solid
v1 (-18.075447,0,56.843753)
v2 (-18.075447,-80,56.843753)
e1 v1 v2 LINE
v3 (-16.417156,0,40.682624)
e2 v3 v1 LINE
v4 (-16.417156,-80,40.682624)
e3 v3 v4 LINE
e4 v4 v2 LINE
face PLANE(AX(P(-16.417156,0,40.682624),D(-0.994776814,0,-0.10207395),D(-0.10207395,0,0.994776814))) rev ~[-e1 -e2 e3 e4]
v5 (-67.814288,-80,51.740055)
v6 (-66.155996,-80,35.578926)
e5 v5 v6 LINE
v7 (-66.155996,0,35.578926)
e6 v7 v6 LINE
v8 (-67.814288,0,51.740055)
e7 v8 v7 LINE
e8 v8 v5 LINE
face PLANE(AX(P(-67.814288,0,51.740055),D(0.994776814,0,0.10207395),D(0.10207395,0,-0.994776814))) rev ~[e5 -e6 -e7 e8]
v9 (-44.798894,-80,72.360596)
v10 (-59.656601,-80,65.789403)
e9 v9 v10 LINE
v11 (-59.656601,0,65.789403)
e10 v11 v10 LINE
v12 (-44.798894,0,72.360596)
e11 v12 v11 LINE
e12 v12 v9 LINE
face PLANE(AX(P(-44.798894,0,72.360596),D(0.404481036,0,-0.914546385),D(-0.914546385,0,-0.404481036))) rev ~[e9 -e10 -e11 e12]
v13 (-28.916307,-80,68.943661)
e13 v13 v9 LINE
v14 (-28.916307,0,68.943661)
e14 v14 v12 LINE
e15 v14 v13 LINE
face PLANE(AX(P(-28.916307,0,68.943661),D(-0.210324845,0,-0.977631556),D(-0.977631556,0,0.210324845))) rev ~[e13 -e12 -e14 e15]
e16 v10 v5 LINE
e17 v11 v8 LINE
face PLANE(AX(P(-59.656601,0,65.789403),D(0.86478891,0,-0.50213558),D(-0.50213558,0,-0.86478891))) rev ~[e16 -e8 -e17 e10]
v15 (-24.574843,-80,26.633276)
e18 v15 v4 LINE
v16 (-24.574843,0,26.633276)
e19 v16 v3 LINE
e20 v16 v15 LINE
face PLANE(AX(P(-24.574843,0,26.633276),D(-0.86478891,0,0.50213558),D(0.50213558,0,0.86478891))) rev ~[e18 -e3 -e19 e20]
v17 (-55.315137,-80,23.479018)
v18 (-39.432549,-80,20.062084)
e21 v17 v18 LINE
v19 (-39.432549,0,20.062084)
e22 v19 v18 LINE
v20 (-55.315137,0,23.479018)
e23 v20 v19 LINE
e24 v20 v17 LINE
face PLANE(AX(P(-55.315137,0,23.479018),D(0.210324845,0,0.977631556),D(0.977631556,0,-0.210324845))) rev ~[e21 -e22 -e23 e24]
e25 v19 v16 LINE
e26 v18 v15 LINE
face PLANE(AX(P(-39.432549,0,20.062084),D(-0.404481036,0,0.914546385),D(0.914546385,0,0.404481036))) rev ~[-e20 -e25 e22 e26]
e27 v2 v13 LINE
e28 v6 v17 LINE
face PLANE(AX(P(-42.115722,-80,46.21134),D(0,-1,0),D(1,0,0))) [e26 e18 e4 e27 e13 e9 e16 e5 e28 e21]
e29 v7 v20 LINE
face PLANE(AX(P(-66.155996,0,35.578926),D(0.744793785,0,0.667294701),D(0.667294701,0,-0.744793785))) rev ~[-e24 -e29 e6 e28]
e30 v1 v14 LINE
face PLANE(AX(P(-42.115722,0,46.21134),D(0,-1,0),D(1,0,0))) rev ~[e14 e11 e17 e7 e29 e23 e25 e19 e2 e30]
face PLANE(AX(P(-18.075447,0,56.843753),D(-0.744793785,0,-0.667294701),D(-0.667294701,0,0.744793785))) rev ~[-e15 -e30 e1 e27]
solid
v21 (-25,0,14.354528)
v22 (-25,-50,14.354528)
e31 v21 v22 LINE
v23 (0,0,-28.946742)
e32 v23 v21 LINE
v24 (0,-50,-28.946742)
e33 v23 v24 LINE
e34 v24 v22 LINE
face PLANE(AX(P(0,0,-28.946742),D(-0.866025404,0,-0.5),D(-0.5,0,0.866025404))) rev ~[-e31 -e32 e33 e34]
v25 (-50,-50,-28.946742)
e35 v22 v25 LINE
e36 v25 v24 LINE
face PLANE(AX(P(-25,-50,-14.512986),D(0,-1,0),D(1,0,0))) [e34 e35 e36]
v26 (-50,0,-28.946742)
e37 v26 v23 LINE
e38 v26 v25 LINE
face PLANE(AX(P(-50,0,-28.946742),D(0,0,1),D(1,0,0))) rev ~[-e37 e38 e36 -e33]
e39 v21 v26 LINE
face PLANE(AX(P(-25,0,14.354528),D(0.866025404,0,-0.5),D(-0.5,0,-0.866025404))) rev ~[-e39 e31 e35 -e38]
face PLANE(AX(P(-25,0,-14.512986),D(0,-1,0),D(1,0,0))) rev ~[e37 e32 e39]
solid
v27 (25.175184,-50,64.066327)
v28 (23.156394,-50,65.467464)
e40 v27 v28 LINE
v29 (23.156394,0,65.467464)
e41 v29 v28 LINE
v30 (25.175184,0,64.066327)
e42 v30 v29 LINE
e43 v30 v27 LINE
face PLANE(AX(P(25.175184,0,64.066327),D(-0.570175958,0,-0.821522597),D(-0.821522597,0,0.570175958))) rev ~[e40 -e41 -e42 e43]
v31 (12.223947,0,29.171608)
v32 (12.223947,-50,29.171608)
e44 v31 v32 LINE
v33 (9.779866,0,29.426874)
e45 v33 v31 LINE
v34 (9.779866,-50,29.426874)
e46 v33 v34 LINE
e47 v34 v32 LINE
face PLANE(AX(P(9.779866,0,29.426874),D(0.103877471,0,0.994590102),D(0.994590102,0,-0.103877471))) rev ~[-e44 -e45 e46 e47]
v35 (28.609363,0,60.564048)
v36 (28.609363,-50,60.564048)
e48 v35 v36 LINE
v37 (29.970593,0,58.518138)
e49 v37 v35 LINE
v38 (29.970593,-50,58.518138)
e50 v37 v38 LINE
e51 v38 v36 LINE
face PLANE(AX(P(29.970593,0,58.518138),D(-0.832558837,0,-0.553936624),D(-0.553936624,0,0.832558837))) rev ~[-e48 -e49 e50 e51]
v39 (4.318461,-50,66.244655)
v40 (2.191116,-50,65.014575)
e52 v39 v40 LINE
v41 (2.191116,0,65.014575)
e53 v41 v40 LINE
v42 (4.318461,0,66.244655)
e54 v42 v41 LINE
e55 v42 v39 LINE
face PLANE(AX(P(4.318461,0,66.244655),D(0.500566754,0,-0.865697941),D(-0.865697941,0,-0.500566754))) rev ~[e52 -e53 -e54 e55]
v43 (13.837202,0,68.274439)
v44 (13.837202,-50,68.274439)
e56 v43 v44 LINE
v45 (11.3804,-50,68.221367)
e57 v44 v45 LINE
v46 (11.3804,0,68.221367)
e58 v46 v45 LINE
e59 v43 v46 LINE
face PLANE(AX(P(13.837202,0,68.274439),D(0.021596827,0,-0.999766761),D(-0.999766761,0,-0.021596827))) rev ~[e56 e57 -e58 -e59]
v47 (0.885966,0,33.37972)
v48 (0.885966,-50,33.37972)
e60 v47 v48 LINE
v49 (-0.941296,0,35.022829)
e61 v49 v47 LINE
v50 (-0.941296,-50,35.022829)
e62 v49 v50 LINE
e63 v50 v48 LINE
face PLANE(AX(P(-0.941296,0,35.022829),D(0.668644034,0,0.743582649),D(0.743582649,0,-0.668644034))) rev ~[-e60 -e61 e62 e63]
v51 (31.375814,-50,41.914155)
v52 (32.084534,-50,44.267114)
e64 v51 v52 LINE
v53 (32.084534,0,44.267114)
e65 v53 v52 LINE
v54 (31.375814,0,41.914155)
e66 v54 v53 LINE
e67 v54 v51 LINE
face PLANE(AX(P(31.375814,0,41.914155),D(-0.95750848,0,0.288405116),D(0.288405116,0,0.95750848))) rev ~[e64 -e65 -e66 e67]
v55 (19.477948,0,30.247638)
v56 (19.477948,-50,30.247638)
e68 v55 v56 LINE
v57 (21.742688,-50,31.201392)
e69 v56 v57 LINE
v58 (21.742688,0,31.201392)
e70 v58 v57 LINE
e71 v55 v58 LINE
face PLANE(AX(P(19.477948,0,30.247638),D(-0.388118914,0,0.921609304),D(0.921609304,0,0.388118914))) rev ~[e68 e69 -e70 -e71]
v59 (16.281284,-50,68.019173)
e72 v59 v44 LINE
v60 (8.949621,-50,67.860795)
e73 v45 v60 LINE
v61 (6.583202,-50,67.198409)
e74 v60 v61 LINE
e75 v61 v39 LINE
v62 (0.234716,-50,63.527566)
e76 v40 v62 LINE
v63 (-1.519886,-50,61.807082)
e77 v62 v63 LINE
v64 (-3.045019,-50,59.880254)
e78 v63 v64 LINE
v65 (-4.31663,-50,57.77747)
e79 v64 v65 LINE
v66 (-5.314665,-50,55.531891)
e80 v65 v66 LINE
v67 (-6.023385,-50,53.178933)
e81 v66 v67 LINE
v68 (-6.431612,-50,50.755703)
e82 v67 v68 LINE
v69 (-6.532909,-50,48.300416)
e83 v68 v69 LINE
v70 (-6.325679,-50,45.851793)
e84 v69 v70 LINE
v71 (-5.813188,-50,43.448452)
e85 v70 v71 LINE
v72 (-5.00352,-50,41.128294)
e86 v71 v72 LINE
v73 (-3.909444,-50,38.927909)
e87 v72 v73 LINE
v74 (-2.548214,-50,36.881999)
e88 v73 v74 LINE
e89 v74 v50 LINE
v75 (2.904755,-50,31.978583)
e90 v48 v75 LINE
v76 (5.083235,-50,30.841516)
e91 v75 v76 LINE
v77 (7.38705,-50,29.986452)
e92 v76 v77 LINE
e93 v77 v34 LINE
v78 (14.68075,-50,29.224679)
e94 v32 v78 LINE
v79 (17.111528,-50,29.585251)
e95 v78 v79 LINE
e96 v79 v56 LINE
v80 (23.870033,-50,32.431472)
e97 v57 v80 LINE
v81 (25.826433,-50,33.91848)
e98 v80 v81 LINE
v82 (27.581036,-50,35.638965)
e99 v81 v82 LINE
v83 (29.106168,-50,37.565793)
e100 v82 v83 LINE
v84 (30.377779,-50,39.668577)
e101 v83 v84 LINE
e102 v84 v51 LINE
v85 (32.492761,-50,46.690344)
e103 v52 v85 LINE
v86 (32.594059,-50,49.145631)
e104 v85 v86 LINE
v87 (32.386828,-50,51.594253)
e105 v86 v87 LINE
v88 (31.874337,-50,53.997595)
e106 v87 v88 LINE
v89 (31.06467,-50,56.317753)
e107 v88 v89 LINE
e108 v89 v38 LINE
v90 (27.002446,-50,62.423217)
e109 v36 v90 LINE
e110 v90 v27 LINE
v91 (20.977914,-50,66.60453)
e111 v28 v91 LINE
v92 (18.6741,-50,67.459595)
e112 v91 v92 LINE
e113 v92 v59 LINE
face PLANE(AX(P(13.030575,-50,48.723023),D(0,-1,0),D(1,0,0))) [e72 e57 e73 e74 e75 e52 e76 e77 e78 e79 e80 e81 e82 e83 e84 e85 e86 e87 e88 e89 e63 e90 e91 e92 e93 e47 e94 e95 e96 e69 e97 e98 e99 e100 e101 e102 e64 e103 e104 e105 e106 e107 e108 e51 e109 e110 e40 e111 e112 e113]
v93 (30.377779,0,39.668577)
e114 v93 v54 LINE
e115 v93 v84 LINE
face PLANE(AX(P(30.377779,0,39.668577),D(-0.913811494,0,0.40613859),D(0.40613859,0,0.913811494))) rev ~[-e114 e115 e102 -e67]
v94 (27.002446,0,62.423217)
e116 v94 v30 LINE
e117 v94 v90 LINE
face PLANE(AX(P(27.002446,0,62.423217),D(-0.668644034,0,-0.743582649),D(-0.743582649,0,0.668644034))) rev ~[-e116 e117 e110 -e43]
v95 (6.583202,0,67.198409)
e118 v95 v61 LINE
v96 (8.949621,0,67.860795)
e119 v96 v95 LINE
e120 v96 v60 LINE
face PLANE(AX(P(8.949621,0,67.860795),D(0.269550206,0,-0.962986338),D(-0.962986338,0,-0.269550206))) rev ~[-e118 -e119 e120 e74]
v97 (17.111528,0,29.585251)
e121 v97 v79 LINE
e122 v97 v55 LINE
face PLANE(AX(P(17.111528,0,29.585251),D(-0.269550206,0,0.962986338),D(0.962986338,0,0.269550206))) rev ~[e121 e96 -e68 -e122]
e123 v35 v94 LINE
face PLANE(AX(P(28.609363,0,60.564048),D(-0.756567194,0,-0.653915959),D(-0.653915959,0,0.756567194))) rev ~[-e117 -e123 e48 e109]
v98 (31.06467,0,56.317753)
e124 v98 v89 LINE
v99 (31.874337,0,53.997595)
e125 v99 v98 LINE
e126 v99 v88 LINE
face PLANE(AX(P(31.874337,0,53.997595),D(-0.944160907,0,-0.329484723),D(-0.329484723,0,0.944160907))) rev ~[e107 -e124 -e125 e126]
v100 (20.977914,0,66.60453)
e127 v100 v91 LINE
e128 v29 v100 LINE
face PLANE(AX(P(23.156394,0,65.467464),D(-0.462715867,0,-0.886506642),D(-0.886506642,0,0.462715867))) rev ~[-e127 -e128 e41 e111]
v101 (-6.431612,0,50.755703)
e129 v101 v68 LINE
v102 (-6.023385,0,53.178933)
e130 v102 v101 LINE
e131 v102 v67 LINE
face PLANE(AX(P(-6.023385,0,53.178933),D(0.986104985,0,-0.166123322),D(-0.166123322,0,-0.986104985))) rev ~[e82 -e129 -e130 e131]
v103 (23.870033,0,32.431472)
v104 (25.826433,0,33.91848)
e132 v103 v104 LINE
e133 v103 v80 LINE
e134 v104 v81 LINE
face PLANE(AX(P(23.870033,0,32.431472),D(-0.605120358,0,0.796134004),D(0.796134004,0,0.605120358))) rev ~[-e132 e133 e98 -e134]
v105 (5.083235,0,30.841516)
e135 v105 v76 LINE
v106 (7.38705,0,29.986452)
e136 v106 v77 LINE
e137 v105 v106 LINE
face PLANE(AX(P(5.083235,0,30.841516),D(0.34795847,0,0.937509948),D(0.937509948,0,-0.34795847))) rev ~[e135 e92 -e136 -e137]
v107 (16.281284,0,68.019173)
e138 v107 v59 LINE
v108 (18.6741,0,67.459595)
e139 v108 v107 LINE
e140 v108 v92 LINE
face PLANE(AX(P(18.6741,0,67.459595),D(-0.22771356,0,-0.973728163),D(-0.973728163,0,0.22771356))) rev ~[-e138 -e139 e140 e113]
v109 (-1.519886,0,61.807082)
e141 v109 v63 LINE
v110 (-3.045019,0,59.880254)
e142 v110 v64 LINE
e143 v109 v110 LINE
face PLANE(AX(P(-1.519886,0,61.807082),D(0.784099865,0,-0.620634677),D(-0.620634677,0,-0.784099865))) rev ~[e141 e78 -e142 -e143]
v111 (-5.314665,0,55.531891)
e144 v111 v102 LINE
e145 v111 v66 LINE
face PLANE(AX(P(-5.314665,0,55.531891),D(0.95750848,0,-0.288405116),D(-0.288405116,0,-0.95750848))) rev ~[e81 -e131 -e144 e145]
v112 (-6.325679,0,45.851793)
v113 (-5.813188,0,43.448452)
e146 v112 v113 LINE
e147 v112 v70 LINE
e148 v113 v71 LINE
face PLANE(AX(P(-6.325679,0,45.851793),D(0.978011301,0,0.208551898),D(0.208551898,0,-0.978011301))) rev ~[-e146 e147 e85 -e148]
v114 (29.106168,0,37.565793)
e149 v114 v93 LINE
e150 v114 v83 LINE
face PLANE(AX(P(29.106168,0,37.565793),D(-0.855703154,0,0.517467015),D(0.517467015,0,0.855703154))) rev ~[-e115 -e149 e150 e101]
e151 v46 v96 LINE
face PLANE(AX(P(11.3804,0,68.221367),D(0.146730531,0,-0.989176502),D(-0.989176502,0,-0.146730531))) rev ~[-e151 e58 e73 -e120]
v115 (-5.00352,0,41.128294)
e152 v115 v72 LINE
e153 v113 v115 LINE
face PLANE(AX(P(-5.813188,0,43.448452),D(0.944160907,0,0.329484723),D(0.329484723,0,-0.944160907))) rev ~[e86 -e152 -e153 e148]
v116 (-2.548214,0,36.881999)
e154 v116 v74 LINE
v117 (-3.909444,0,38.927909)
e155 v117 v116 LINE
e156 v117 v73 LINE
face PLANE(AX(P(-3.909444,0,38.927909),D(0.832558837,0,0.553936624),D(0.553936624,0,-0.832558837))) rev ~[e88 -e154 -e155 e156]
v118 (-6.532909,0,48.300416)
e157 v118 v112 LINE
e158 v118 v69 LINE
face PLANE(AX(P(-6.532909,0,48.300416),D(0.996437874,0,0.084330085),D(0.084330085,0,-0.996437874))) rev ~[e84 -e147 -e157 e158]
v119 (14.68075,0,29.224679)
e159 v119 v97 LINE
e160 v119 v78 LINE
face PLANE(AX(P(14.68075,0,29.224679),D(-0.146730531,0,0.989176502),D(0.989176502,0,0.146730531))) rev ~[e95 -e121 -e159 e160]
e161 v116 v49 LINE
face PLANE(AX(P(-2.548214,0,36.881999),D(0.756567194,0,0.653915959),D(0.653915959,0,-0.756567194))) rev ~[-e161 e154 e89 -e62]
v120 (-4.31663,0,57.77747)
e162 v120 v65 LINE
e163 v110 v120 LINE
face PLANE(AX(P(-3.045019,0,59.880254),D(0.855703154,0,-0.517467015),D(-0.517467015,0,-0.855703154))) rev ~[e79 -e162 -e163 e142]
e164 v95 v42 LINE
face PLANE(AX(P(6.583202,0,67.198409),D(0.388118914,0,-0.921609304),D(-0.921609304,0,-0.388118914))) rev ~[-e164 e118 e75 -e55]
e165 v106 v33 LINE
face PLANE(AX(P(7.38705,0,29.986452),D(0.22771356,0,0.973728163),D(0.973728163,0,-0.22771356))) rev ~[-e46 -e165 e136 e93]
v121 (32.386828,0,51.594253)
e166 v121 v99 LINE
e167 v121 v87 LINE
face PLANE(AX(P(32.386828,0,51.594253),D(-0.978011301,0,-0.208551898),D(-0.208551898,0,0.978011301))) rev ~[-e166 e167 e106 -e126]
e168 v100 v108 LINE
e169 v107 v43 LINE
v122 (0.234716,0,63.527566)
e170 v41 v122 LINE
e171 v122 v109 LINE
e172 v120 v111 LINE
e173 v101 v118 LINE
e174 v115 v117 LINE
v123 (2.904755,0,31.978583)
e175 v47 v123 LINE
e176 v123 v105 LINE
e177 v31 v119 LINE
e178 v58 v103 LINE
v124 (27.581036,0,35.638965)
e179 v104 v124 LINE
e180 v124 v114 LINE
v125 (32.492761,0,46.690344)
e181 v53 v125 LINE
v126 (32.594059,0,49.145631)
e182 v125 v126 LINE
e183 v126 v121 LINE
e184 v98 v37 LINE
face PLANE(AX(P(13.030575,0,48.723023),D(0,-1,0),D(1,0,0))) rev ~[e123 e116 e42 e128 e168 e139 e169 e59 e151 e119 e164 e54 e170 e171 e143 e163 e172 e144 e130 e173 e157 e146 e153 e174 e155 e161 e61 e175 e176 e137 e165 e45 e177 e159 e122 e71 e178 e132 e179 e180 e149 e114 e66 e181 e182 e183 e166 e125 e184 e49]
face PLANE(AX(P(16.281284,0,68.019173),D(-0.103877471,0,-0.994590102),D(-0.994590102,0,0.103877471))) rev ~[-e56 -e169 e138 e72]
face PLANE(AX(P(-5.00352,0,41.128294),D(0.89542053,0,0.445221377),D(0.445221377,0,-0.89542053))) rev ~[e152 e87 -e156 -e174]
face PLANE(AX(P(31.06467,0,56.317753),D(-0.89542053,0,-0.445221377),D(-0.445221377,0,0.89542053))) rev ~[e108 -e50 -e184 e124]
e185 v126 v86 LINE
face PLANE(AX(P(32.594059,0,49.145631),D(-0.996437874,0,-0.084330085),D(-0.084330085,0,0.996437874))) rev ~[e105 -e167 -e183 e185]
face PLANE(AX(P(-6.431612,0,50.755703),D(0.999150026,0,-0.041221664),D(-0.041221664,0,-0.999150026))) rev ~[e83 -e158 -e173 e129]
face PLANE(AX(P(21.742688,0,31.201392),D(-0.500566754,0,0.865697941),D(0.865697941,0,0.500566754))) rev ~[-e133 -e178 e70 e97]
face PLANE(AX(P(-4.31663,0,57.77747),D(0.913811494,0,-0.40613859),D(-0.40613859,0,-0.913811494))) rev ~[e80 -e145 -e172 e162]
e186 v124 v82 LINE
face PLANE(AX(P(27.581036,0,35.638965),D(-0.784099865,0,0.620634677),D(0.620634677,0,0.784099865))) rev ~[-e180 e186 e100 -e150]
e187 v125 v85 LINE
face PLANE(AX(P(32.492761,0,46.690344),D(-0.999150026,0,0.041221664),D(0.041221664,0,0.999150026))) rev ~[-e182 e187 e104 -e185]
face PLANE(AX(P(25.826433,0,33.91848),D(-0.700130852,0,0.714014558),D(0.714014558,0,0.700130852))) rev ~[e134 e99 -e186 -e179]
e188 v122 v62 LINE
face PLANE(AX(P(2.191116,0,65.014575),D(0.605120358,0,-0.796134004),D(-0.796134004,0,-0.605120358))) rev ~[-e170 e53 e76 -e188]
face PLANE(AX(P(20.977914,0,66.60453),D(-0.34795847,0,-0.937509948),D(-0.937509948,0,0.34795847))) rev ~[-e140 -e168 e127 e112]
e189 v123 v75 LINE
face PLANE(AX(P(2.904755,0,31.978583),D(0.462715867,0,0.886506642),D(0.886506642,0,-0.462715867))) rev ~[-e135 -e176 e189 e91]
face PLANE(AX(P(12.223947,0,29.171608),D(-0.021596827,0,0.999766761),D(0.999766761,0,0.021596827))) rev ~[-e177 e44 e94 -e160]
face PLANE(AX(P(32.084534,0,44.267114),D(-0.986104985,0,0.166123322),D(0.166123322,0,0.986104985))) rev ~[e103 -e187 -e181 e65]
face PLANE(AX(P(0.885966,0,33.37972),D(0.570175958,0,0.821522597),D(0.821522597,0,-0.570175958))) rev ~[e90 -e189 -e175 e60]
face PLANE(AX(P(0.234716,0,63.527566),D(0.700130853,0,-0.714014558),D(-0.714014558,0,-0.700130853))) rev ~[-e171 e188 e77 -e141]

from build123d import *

# Parameters (mm, degrees)
F1_DEPTH = 50
F3_DEPTH = 80
F5_DEPTH = 50


# Not quite as in the source:
# - the program builds the solid bodies; features that only make, move or delete a surface that nothing else refers to are left out


with BuildPart() as f1:
    # F0 (on Front) → F1 (new body)
    with BuildSketch(Plane.XZ):
        Polygon((-25, 14.3545279566), (-50, -28.9467422326), (0, -28.9467422326), align=None)
    extrude(amount=F1_DEPTH)


with BuildPart() as f3:
    # F2 (on Front) → F3 (new body)
    with BuildSketch(Plane.XZ):
        Polygon((-24.5748425958, 26.6332762849), (-16.4171555915, 40.6826237873), (-18.0754474364, 56.8437527904), (-28.9163070091, 68.9436613118), (-44.79889442, 72.360595557), (-59.6566011074, 65.7894027817), (-67.8142881117, 51.7400552794), (-66.1559962667, 35.5789262762), (-55.3151366941, 23.4790177548), (-39.4325492832, 20.0620835096), align=None)
    extrude(amount=F3_DEPTH)


with BuildPart() as f5:
    # F4 (on Front) → F5 (new body)
    with BuildSketch(Plane.XZ):
        Polygon((30.3777791232, 39.6685771282), (31.3758142621, 41.9141553704), (32.0845340135, 44.2671135286), (32.4927614435, 46.6903440471), (32.5940585619, 49.145631133), (32.3868278523, 51.5942534423), (31.874337467, 53.9975947383), (31.0646696855, 56.3177528933), (29.9705934524, 58.518137627), (28.6093630033, 60.5640475578), (27.0024457557, 62.4232174639), (25.1751837545, 64.0663271253), (23.156394013, 65.467463721), (20.9779140514, 66.60453049), (18.6740998, 67.4595952101), (16.2812837859, 68.0191729998), (13.8372021469, 68.2744389831), (11.3803995105, 68.2213674629), (8.9496211219, 67.8607954089), (6.5832018085, 67.1984092578), (4.3184614163, 66.2446552347), (2.1911162543, 65.0145746105), (0.2347158265, 63.5275664914), (-1.5198862636, 61.8070818836), (-3.0450188931, 59.8802538573), (-4.3166298091, 57.7774696414), (-5.314664948, 55.5318913992), (-6.0233846994, 53.178933241), (-6.4316121295, 50.7557027225), (-6.5329092478, 48.3004156366), (-6.3256785383, 45.8517933273), (-5.813188153, 43.4484520313), (-5.0035203715, 41.1282938764), (-3.9094441383, 38.9279091426), (-2.5482136893, 36.8819992118), (-0.9412964417, 35.0228293057), (0.8859655595, 33.3797196443), (2.904755301, 31.9785830486), (5.0832352626, 30.8415162796), (7.387049514, 29.9864515595), (9.7798655282, 29.4268737698), (12.2239471672, 29.1716077865), (14.6807498036, 29.2246793067), (17.1115281921, 29.5852513607), (19.4779475056, 30.2476375118), (21.7426878977, 31.2013915349), (23.8700330597, 32.4314721591), (25.8264334875, 33.9184802783), (27.5810355777, 35.638964886), (29.1061682071, 37.5657929123), align=None)
    extrude(amount=F5_DEPTH)


solid = Compound([f1.part, f3.part, f5.part])
